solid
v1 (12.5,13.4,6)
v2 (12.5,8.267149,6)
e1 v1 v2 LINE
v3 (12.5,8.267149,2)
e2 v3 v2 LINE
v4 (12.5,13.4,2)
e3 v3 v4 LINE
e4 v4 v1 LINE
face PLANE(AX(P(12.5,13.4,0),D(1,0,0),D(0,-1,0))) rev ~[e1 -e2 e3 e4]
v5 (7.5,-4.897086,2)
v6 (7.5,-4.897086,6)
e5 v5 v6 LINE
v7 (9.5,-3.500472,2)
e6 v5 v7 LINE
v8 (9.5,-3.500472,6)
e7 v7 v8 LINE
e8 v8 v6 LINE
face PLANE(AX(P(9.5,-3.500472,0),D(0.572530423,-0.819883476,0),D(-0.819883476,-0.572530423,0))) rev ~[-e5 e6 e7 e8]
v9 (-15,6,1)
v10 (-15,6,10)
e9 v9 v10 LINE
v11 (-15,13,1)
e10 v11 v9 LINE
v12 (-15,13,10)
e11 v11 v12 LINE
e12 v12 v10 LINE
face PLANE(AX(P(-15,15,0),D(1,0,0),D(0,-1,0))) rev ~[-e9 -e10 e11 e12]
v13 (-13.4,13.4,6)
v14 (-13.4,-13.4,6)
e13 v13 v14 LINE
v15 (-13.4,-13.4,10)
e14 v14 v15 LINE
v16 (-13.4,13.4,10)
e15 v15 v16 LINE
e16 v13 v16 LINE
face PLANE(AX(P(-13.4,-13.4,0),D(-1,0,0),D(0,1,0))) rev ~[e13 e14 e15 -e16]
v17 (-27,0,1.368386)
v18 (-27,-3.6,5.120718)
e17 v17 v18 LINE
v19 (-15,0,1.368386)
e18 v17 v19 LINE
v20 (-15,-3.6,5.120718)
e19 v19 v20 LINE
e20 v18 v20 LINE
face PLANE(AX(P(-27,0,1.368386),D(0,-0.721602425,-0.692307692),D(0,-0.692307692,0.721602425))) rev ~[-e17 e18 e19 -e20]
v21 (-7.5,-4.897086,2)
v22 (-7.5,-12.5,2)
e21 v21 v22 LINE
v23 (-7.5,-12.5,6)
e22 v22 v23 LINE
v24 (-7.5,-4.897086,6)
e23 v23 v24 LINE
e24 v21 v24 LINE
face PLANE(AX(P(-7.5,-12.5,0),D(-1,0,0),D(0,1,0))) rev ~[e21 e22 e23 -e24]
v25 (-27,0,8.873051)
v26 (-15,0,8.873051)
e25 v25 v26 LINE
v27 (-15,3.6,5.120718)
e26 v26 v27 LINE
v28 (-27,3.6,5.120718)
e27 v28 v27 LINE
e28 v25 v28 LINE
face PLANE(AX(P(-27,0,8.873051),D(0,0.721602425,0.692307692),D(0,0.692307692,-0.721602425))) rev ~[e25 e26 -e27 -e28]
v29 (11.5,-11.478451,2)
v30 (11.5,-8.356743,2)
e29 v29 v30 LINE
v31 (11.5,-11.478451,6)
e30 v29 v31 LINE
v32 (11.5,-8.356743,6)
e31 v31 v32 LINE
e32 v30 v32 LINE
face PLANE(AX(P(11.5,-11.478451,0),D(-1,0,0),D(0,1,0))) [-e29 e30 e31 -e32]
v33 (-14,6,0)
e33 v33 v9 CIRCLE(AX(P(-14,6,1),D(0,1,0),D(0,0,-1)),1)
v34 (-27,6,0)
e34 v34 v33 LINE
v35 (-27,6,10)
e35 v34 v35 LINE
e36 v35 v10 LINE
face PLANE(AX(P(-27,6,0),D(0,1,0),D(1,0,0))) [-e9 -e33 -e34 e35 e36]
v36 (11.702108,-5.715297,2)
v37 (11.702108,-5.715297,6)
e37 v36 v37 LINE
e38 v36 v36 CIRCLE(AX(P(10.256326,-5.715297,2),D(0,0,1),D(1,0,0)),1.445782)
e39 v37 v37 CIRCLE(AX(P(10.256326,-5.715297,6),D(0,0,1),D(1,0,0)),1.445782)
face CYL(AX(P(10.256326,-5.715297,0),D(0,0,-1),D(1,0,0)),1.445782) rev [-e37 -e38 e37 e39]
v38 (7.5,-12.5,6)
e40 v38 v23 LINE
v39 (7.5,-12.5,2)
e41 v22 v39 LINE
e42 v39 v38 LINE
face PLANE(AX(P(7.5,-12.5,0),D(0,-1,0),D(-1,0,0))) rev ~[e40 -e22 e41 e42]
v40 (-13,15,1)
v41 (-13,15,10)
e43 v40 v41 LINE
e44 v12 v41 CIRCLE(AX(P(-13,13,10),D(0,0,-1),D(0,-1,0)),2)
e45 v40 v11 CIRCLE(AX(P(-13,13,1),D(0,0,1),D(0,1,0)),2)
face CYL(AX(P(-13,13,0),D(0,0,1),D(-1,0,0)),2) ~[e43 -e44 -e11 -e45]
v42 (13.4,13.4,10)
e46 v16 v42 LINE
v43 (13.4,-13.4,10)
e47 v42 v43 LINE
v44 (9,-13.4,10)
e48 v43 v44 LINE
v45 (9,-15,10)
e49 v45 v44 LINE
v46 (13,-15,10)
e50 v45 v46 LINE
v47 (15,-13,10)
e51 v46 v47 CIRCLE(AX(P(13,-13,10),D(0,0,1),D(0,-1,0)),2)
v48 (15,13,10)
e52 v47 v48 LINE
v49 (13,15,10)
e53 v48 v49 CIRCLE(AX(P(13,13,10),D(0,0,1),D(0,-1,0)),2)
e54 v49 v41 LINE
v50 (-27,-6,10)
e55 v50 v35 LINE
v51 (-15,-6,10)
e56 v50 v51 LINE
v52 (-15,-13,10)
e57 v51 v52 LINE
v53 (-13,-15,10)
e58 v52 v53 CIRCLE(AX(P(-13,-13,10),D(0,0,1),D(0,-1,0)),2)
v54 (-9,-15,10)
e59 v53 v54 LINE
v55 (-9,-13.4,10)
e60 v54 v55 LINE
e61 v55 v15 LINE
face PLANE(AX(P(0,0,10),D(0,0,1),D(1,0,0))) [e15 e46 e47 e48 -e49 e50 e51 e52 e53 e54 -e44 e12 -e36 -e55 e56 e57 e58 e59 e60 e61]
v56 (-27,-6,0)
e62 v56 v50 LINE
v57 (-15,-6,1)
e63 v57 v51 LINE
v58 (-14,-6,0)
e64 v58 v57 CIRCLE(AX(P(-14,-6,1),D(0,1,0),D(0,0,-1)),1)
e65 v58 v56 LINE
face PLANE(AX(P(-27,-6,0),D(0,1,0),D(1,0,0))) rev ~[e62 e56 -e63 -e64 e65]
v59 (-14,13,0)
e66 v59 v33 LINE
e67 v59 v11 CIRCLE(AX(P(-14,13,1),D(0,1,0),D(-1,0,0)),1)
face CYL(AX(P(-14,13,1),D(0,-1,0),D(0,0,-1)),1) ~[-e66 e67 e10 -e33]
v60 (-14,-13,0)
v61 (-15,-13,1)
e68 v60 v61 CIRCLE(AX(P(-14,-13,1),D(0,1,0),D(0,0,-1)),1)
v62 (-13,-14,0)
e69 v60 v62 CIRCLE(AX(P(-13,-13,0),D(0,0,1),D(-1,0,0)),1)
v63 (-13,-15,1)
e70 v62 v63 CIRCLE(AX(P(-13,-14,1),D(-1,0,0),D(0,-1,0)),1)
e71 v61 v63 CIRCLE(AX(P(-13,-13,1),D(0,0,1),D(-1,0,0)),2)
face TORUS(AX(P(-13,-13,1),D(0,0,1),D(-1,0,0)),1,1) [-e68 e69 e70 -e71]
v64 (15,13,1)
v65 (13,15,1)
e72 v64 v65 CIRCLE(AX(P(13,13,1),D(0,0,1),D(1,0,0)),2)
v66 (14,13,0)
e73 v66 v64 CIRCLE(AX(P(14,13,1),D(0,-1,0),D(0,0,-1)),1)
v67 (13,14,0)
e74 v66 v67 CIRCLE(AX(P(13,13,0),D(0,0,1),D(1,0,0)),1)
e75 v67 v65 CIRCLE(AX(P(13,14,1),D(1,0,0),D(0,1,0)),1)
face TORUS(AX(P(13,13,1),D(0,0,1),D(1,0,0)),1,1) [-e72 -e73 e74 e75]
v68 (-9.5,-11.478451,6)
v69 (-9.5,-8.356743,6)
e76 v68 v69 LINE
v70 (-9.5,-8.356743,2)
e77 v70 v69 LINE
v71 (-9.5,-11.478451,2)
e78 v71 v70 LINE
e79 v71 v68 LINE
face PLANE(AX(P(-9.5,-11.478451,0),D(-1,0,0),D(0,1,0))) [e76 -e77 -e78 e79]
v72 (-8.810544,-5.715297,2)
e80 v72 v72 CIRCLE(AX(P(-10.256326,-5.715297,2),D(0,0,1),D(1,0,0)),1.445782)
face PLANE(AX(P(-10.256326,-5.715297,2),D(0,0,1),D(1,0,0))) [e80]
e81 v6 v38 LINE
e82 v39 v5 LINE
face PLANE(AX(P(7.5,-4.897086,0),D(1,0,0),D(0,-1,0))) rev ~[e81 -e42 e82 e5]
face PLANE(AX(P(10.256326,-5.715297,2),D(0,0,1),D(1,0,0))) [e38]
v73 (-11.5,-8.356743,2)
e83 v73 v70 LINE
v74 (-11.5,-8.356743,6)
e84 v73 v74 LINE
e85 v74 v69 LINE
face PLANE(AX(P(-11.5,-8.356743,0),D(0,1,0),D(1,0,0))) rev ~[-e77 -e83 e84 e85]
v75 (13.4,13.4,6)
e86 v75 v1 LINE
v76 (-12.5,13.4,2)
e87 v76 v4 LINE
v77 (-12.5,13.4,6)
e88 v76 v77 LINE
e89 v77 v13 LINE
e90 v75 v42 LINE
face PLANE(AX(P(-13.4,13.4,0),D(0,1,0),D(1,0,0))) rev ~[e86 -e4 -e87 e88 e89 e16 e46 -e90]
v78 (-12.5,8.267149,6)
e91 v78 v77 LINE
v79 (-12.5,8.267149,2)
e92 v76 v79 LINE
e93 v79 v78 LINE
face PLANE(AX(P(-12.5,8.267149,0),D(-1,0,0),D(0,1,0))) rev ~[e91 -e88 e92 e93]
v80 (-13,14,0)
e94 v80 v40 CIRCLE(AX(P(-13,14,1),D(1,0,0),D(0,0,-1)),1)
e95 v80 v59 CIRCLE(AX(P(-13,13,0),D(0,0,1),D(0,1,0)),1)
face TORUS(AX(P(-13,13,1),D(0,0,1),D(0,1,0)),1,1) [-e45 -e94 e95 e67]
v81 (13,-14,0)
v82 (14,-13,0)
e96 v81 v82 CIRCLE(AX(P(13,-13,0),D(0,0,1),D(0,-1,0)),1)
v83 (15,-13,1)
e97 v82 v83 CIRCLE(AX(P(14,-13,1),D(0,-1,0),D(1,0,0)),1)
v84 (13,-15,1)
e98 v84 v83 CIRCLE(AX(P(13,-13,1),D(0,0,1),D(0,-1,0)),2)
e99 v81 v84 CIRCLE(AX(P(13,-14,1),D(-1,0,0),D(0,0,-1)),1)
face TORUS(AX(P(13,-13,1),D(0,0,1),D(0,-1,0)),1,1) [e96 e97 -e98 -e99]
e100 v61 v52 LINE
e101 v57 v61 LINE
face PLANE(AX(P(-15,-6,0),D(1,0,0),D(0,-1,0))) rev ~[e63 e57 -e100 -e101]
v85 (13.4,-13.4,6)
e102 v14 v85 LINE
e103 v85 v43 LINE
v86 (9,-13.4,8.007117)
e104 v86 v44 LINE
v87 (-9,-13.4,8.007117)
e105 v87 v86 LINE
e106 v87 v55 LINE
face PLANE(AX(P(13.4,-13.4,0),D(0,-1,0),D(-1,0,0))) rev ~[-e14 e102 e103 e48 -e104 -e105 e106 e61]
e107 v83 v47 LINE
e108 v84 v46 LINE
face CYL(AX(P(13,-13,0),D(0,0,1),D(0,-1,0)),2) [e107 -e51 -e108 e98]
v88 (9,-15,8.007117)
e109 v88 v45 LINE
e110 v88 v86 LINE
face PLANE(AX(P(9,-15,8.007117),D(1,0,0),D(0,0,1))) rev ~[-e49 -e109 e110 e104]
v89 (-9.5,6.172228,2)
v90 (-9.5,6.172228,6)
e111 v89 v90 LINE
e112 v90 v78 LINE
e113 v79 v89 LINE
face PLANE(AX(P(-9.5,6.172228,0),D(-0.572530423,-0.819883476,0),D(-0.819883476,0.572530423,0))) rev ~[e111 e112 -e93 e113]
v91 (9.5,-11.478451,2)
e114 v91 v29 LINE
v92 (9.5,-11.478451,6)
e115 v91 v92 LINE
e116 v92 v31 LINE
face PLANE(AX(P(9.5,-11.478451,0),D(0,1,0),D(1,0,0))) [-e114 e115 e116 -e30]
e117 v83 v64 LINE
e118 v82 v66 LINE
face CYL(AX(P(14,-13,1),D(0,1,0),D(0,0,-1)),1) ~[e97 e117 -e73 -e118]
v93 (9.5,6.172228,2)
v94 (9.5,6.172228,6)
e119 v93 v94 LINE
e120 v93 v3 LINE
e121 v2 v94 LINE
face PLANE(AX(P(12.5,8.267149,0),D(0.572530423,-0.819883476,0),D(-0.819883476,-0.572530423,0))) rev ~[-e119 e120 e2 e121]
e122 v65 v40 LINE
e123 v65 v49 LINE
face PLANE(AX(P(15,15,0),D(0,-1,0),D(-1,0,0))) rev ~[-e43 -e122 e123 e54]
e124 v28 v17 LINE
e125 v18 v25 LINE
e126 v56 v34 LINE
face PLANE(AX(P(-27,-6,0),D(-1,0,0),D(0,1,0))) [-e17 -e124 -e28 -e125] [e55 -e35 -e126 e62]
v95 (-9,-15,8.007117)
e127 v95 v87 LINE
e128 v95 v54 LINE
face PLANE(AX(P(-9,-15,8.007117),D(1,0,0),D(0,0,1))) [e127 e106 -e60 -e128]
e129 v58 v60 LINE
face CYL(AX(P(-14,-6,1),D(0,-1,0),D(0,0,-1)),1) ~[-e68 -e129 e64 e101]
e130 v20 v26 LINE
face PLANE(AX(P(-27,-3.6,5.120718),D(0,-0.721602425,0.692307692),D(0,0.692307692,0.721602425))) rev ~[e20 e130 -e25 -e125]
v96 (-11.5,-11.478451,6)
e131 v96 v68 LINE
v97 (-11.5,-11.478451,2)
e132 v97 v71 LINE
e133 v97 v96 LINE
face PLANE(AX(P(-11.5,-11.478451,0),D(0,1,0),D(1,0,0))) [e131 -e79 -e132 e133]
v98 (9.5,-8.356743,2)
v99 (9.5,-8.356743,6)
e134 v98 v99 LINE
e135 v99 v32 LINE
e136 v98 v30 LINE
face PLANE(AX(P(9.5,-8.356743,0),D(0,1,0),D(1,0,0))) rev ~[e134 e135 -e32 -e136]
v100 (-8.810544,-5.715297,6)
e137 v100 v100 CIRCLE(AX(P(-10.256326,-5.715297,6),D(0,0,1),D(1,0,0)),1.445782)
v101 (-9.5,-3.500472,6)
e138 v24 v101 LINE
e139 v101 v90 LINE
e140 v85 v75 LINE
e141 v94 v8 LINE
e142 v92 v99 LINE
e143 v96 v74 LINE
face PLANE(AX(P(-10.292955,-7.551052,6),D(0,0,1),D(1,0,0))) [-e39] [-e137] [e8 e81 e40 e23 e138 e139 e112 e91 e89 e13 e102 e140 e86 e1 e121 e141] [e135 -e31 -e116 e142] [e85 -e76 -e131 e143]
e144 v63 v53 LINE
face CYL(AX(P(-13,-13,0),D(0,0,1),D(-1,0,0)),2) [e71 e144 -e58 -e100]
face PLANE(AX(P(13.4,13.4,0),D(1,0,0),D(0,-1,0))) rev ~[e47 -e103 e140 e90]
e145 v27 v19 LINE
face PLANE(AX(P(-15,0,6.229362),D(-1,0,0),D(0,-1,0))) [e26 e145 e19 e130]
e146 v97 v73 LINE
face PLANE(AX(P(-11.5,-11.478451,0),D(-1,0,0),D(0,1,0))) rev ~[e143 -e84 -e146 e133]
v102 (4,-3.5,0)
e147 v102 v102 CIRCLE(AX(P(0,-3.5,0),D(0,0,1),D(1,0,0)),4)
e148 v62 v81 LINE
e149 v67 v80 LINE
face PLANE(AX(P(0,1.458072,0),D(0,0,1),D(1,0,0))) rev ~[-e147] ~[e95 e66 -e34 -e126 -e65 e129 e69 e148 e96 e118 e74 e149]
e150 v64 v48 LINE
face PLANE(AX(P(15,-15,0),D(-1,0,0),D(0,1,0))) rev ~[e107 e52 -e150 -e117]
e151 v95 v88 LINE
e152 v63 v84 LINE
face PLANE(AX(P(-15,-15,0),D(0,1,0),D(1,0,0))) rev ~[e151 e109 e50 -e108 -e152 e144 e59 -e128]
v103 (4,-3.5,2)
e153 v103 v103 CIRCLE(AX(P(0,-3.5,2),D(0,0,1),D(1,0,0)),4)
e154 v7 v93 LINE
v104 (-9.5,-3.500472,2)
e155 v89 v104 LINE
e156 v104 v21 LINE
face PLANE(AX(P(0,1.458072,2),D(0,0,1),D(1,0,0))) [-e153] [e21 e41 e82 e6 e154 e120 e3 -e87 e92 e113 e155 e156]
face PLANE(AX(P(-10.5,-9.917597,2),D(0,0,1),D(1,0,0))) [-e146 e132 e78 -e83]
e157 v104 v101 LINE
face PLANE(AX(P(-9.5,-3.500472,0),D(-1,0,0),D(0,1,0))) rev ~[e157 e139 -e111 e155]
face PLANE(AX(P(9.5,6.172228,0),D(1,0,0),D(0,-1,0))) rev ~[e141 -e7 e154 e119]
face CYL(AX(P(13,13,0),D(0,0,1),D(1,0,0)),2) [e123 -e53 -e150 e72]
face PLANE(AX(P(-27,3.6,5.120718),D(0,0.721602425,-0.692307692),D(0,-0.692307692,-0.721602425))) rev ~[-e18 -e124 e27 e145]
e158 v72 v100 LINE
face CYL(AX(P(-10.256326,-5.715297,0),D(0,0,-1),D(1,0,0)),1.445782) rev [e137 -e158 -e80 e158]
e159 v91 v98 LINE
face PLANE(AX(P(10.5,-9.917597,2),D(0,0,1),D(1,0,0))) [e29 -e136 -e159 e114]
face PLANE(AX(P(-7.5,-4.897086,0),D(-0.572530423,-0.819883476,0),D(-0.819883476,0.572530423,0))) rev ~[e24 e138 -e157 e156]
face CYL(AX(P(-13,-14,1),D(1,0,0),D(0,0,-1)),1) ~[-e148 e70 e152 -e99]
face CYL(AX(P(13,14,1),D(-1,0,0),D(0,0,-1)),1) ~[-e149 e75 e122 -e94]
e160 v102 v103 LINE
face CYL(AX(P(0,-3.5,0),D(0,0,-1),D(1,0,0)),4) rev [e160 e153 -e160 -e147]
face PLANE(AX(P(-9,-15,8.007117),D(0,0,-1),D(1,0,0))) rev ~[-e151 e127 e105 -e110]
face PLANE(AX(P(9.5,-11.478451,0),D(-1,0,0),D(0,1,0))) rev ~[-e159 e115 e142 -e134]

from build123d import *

# Parameters (mm, degrees)
F0_W     = 12
F0_H     = 12
F1_DEPTH = 10
F0_W_2   = 2
F0_H_2   = 3.1217085198
F0_R     = 1.4457822704
F2_DEPTH = 6
F0_R_2   = 4
F0_W_3   = 25
F0_H_3   = 0.9
F3_DEPTH = 2
F5_DEPTH = 12
F6_R     = 2
F7_R     = 1
F8_W     = 18
F8_H     = 1.9928832203
F9_DEPTH = 25


# Not quite as in the source:
# - a feature names something its author has since deleted; it is built from what else it names


with BuildPart() as f1:
    # F0 (on Top) → F1 (new body)
    with BuildSketch(Plane.XY):
        Polygon((15, -15), (15, 15), (-15, 15), (-15, 6), (-15, -6), (-15, -15), align=None)
        Polygon((12.5, 13.4), (13.4, 13.4), (13.4, -13.4), (-13.4, -13.4), (-13.4, 13.4), (-12.5, 13.4), align=None, mode=Mode.SUBTRACT)
        with Locations((-21, 0)):
            Rectangle(F0_W, F0_H)
    extrude(amount=F1_DEPTH)

    # F0 (on Top) → F2 (join)
    with BuildSketch(Plane.XY):
        Polygon((-9.5, -3.5004718229), (-12.5, -1.4055506326), (-12.5, -12.5), (-7.5, -12.5), (-7.5, -4.8970859498), align=None)
        with Locations((-10.5, -9.9175968207)):
            Rectangle(F0_W_2, F0_H_2, mode=Mode.SUBTRACT)
        with Locations((-10.256325826, -5.7152966037)):
            Circle(F0_R, mode=Mode.SUBTRACT)
        Polygon((-9.5, 6.1722276732), (-12.5, 8.2671488635), (-12.5, -1.4055506326), (-9.5, -3.5004718229), align=None)
        Polygon((12.5, -1.4055506326), (12.5, 8.2671488635), (9.5, 6.1722276732), (9.5, -3.5004718229), align=None)
        Polygon((12.5, -12.5), (12.5, -1.4055506326), (9.5, -3.5004718229), (7.5, -4.8970859498), (7.5, -12.5), align=None)
        with Locations((10.5, -9.9175968207)):
            Rectangle(F0_W_2, F0_H_2, mode=Mode.SUBTRACT)
        with Locations((10.256325826, -5.7152966037)):
            Circle(F0_R, mode=Mode.SUBTRACT)
        Polygon((13.4, -13.4), (13.4, 13.4), (12.5, 13.4), (12.5, 12.5), (12.5, 8.2671488635), (12.5, -1.4055506326), (12.5, -12.5), (7.5, -12.5), (-7.5, -12.5), (-12.5, -12.5), (-12.5, -1.4055506326), (-12.5, 8.2671488635), (-12.5, 12.5), (-12.5, 13.4), (-13.4, 13.4), (-13.4, -13.4), align=None)
    extrude(amount=F2_DEPTH)

    # F0 (on Top) → F3 (join)
    with BuildSketch(Plane.XY):
        Polygon((12.5, 8.2671488635), (12.5, 12.5), (-12.5, 12.5), (-12.5, 8.2671488635), (-9.5, 6.1722276732), (-9.5, -3.5004718229), (-7.5, -4.8970859498), (-7.5, -12.5), (7.5, -12.5), (7.5, -4.8970859498), (9.5, -3.5004718229), (9.5, 6.1722276732), align=None)
        with Locations((0, -3.5)):
            Circle(F0_R_2, mode=Mode.SUBTRACT)
        with Locations((10.256325826, -5.7152966037)):
            Circle(F0_R)
        with Locations((10.5, -9.9175968207)):
            Rectangle(F0_W_2, F0_H_2)
        with Locations((-10.5, -9.9175968207)):
            Rectangle(F0_W_2, F0_H_2)
        with Locations((-10.256325826, -5.7152966037)):
            Circle(F0_R)
        with Locations((0, 12.95)):
            Rectangle(F0_W_3, F0_H_3)
    extrude(amount=F3_DEPTH)

    # F4 (on face) → F5 (cut)
    with BuildSketch(Plane(origin=(-27, 0, 0), x_dir=(0, -1, 0), z_dir=(-1, 0, 0))):
        Polygon((-3.6, 5.1207184246), (3.6, 5.1207184246), (0, 8.8730510324), align=None)
        Polygon((0, 1.3683858167), (3.6, 5.1207184246), (-3.6, 5.1207184246), align=None)
    extrude(amount=-F5_DEPTH, mode=Mode.SUBTRACT)

    # F6
    f6_edges = [f1.edges().sort_by_distance(p)[0] for p in [
        (15, 15, 5),
        (-15, 15, 5),
        (-15, -15, 5),
        (15, -15, 5),
    ]]
    fillet(f6_edges, radius=F6_R)

    # F7
    f7_edges = [f1.edges().sort_by_distance(p)[0] for p in [
        (-15, -9.5, 0),
        (0, -15, 0),
    ]]
    fillet(f7_edges, radius=F7_R)

    # F8 (on face) → F9 (cut)
    with BuildSketch(Plane.XZ.offset(15)):
        with Locations((0, 9.0035583898)):
            Rectangle(F8_W, F8_H)
    extrude(amount=-F9_DEPTH, mode=Mode.SUBTRACT)


solid = f1.part
